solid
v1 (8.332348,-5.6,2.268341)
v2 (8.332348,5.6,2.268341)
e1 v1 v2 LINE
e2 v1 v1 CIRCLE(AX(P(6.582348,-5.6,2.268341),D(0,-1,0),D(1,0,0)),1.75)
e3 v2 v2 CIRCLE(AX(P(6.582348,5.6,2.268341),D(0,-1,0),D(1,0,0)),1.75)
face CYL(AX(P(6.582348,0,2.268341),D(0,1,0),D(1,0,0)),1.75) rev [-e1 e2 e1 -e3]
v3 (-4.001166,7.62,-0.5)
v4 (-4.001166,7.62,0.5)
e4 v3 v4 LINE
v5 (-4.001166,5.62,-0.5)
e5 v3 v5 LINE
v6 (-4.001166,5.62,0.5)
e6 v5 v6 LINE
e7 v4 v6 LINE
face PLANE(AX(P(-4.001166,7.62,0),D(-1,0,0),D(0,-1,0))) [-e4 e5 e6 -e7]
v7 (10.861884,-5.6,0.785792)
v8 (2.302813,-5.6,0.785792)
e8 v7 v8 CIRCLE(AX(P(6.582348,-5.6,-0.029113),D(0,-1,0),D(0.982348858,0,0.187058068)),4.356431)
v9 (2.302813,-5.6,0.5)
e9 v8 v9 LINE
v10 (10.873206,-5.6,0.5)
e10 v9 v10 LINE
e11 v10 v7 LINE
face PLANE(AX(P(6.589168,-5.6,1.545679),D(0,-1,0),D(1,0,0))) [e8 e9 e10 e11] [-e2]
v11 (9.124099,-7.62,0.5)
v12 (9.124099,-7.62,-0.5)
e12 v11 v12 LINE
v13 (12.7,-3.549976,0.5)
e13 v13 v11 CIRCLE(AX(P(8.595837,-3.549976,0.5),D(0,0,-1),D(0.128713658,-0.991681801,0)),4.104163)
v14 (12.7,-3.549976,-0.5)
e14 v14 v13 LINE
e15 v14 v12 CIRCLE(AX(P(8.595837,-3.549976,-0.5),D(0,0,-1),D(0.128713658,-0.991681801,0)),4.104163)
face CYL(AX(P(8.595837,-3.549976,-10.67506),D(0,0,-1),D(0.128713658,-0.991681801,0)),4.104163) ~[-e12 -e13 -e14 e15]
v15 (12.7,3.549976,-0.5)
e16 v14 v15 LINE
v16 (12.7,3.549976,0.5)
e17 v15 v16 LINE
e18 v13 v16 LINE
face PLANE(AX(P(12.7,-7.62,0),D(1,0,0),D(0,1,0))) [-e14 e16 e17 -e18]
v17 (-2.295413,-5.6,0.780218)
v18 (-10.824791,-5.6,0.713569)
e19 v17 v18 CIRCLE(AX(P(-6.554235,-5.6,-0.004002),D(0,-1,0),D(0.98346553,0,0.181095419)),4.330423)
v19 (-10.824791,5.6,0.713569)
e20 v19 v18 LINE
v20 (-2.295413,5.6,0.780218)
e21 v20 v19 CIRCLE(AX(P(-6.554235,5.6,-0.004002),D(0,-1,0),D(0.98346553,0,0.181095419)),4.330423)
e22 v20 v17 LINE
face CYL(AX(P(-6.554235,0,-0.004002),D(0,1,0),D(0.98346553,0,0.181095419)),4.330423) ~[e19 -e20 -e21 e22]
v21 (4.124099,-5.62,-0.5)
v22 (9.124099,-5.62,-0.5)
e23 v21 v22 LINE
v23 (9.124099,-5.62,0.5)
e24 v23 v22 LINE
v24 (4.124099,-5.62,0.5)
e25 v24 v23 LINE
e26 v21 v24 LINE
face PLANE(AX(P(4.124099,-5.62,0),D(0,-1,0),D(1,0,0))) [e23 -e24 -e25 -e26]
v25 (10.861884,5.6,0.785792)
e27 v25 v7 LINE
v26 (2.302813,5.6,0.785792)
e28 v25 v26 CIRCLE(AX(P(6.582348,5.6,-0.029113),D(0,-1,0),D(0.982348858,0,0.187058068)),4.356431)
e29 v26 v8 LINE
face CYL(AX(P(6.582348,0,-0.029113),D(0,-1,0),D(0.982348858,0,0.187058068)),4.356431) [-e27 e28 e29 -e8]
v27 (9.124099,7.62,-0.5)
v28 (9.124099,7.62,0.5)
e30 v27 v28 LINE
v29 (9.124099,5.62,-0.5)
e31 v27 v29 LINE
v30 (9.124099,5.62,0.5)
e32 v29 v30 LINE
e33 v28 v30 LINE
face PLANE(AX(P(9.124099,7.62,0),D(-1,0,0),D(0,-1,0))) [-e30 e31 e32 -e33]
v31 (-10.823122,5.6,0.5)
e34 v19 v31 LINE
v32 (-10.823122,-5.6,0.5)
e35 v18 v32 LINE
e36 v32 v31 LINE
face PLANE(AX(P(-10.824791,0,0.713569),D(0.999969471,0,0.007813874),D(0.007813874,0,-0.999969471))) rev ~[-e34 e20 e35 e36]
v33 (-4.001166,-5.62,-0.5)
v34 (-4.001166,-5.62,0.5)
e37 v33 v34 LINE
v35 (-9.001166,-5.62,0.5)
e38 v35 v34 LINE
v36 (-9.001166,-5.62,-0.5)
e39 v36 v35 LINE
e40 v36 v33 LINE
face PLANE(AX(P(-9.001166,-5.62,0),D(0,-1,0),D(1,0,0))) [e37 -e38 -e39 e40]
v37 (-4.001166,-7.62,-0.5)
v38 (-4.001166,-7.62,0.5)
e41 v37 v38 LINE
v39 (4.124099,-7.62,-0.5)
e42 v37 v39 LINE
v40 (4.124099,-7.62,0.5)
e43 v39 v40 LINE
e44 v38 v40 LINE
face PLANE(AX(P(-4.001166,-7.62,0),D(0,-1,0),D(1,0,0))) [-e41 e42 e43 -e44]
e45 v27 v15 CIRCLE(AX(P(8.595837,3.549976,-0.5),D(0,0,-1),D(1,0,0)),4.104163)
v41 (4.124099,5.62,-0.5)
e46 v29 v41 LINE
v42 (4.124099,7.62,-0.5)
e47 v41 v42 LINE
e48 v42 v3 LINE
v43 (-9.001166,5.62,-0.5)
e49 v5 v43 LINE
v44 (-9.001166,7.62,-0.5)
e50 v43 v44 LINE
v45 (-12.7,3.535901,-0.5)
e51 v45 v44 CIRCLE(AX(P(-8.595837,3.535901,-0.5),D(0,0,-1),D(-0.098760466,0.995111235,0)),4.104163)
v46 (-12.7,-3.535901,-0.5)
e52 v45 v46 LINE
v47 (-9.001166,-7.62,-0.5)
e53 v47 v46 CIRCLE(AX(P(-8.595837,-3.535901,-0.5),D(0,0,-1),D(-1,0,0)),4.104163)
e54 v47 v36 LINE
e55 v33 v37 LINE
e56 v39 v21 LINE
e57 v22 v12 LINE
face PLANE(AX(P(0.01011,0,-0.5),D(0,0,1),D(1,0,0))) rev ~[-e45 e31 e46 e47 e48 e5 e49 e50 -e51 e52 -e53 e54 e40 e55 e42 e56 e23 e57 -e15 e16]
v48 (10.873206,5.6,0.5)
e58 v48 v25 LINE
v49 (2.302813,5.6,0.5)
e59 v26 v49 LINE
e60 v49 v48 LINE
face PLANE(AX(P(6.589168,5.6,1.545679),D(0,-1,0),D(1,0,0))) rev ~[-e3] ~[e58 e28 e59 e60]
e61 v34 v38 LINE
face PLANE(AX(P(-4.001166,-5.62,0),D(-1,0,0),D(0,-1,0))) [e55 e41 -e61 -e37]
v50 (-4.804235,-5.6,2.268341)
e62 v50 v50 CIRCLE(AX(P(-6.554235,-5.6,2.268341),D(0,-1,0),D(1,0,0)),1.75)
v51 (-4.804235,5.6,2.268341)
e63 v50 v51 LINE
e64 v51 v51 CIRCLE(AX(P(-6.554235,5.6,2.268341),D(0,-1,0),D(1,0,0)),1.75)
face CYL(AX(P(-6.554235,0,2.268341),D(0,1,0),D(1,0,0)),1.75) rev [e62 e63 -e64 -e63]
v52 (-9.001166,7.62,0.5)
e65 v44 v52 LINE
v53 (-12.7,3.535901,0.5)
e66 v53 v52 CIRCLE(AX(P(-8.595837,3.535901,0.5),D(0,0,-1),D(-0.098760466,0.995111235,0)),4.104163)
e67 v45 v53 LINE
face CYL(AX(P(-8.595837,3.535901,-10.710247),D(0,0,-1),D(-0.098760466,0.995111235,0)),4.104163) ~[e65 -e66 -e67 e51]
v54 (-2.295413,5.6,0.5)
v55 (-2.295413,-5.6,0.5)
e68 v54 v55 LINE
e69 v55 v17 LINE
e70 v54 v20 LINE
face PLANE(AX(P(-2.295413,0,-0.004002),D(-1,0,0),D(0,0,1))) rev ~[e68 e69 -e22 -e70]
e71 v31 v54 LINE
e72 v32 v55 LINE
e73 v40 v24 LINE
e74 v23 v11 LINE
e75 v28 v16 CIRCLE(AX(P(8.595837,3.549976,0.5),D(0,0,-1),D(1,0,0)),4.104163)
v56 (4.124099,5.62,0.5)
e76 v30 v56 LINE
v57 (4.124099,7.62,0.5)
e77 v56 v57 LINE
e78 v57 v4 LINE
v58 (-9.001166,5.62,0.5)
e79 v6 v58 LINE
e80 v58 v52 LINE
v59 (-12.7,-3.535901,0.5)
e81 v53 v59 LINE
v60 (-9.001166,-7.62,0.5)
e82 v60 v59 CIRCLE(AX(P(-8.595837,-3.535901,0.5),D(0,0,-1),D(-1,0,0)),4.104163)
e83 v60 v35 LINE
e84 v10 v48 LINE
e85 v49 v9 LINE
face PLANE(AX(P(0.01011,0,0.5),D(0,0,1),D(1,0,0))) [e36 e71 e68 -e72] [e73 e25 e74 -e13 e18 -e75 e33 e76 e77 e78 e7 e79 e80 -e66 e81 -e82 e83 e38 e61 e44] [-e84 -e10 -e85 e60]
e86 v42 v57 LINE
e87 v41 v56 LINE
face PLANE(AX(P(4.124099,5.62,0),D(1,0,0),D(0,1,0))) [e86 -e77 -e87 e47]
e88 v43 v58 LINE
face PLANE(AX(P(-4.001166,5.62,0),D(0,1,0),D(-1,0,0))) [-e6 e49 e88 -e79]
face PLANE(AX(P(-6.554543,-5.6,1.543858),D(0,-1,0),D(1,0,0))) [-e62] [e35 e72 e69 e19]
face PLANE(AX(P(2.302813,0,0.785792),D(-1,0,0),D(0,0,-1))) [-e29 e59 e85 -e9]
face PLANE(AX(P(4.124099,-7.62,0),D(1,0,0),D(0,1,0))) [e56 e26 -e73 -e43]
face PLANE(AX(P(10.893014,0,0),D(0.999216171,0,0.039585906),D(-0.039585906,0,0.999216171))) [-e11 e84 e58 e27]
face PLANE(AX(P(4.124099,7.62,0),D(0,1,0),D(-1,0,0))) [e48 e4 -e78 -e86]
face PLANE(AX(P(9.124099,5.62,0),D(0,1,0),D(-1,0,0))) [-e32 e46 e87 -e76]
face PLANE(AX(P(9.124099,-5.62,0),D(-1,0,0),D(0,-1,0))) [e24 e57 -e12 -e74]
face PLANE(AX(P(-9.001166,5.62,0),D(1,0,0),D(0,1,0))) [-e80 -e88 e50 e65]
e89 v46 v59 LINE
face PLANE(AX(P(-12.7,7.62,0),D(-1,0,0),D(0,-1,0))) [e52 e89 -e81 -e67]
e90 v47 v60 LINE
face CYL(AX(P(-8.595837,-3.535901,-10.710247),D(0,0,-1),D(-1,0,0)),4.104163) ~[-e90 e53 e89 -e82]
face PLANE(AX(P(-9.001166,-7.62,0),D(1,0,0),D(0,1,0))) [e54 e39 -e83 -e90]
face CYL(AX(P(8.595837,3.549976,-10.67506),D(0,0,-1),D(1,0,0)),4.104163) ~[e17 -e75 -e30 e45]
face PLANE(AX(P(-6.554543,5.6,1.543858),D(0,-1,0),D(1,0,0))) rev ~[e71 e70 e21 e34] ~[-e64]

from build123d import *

# Parameters (mm, degrees)
F1_DEPTH    = 0.5
F2_R        = 1.75
F3_DEPTH    = 5.6
F4_T1_DEPTH = 21.3501190522
F4_T3_DEPTH = 21.4204938405


# Not quite as in the source:
# - a fillet or chamfer that OpenCascade refuses, or shapes differently, is made with other operations: its cross-section is extruded or revolved along the edge and cut away or added


with BuildPart() as f1:
    # F0 (on Top) → F1 (new body, symmetric)
    with BuildSketch(Plane.XY):
        Polygon((12.7, -7.62), (12.7, 7.62), (9.1240987852, 7.62), (9.1240987852, 5.62), (4.1240987852, 5.62), (4.1240987852, 7.62), (-4.0011659991, 7.62), (-4.0011659991, 5.62), (-9.0011659991, 5.62), (-9.0011659991, 7.62), (-12.7, 7.62), (-12.7, -7.62), (-9.0011659991, -7.62), (-9.0011659991, -5.62), (-4.0011659991, -5.62), (-4.0011659991, -7.62), (4.1240987852, -7.62), (4.1240987852, -5.62), (9.1240987852, -5.62), (9.1240987852, -7.62), align=None)
    extrude(amount=F1_DEPTH, both=True)

    # F2 (on Front) → F3 (join, symmetric)
    with BuildSketch(Plane.XZ):
        with BuildLine():
            Line((-2.2954130392, -0.004001643), (-2.2954130392, 0.7802180896))
            ThreePointArc((-2.2954130392, 0.7802180896), (-6.588071973, 4.326288954), (-10.8247913043, 0.7135685656))
            Line((-10.8247913043, 0.7135685656), (-10.8191841297, -0.004001643))
            Line((-10.8191841297, -0.004001643), (-6.5542345937, -0.004001643))
            Line((-6.5542345937, -0.004001643), (-2.2954130392, -0.004001643))
        make_face()
        with Locations((-6.5542345937, 2.2683413699)):
            Circle(F2_R, mode=Mode.SUBTRACT)
        with BuildLine():
            Line((10.8930142596, 0), (10.861883565, 0.7857921351))
            ThreePointArc((10.861883565, 0.7857921351), (6.5823484291, 4.3273176658), (2.3028132932, 0.7857921351))
            Line((2.3028132932, 0.7857921351), (2.3028132932, 0))
            Line((2.3028132932, 0), (10.8930142596, 0))
        make_face()
        with Locations((6.5823484291, 2.2683413699)):
            Circle(F2_R, mode=Mode.SUBTRACT)
    extrude(amount=F3_DEPTH, both=True)

    # F4: fillet of radius 4.104163056 on 4 edges, made by hand

    # F4_s2 → F4_t1 (cut)
    with BuildSketch(Plane.XY.offset(-10.6750595261)):
        with BuildLine():
            ThreePointArc((9.1240987852, -7.62), (11.6790355366, -6.2588580306), (12.7, -3.5499761896))
            Line((12.7, -3.5499761896), (12.7, -7.62))
            Line((12.7, -7.62), (9.1240987852, -7.62))
        make_face()
        with BuildLine():
            ThreePointArc((12.7, 3.5499761896), (11.6790355366, 6.2588580306), (9.1240987852, 7.62))
            Line((9.1240987852, 7.62), (12.7, 7.62))
            Line((12.7, 7.62), (12.7, 3.5499761896))
        make_face()
    extrude(amount=F4_T1_DEPTH, mode=Mode.SUBTRACT)

    # F4_s4 → F4_t3 (cut)
    with BuildSketch(Plane.XY.offset(-10.7102469202)):
        with BuildLine():
            ThreePointArc((-9.0011659991, 7.62), (-11.6378503335, 6.2909527611), (-12.7, 3.5359012319))
            Line((-12.7, 3.5359012319), (-12.7, 7.62))
            Line((-12.7, 7.62), (-9.0011659991, 7.62))
        make_face()
        with BuildLine():
            ThreePointArc((-12.7, -3.5359012319), (-11.6378503335, -6.2909527611), (-9.0011659991, -7.62))
            Line((-9.0011659991, -7.62), (-12.7, -7.62))
            Line((-12.7, -7.62), (-12.7, -3.5359012319))
        make_face()
    extrude(amount=F4_T3_DEPTH, mode=Mode.SUBTRACT)


solid = f1.part
